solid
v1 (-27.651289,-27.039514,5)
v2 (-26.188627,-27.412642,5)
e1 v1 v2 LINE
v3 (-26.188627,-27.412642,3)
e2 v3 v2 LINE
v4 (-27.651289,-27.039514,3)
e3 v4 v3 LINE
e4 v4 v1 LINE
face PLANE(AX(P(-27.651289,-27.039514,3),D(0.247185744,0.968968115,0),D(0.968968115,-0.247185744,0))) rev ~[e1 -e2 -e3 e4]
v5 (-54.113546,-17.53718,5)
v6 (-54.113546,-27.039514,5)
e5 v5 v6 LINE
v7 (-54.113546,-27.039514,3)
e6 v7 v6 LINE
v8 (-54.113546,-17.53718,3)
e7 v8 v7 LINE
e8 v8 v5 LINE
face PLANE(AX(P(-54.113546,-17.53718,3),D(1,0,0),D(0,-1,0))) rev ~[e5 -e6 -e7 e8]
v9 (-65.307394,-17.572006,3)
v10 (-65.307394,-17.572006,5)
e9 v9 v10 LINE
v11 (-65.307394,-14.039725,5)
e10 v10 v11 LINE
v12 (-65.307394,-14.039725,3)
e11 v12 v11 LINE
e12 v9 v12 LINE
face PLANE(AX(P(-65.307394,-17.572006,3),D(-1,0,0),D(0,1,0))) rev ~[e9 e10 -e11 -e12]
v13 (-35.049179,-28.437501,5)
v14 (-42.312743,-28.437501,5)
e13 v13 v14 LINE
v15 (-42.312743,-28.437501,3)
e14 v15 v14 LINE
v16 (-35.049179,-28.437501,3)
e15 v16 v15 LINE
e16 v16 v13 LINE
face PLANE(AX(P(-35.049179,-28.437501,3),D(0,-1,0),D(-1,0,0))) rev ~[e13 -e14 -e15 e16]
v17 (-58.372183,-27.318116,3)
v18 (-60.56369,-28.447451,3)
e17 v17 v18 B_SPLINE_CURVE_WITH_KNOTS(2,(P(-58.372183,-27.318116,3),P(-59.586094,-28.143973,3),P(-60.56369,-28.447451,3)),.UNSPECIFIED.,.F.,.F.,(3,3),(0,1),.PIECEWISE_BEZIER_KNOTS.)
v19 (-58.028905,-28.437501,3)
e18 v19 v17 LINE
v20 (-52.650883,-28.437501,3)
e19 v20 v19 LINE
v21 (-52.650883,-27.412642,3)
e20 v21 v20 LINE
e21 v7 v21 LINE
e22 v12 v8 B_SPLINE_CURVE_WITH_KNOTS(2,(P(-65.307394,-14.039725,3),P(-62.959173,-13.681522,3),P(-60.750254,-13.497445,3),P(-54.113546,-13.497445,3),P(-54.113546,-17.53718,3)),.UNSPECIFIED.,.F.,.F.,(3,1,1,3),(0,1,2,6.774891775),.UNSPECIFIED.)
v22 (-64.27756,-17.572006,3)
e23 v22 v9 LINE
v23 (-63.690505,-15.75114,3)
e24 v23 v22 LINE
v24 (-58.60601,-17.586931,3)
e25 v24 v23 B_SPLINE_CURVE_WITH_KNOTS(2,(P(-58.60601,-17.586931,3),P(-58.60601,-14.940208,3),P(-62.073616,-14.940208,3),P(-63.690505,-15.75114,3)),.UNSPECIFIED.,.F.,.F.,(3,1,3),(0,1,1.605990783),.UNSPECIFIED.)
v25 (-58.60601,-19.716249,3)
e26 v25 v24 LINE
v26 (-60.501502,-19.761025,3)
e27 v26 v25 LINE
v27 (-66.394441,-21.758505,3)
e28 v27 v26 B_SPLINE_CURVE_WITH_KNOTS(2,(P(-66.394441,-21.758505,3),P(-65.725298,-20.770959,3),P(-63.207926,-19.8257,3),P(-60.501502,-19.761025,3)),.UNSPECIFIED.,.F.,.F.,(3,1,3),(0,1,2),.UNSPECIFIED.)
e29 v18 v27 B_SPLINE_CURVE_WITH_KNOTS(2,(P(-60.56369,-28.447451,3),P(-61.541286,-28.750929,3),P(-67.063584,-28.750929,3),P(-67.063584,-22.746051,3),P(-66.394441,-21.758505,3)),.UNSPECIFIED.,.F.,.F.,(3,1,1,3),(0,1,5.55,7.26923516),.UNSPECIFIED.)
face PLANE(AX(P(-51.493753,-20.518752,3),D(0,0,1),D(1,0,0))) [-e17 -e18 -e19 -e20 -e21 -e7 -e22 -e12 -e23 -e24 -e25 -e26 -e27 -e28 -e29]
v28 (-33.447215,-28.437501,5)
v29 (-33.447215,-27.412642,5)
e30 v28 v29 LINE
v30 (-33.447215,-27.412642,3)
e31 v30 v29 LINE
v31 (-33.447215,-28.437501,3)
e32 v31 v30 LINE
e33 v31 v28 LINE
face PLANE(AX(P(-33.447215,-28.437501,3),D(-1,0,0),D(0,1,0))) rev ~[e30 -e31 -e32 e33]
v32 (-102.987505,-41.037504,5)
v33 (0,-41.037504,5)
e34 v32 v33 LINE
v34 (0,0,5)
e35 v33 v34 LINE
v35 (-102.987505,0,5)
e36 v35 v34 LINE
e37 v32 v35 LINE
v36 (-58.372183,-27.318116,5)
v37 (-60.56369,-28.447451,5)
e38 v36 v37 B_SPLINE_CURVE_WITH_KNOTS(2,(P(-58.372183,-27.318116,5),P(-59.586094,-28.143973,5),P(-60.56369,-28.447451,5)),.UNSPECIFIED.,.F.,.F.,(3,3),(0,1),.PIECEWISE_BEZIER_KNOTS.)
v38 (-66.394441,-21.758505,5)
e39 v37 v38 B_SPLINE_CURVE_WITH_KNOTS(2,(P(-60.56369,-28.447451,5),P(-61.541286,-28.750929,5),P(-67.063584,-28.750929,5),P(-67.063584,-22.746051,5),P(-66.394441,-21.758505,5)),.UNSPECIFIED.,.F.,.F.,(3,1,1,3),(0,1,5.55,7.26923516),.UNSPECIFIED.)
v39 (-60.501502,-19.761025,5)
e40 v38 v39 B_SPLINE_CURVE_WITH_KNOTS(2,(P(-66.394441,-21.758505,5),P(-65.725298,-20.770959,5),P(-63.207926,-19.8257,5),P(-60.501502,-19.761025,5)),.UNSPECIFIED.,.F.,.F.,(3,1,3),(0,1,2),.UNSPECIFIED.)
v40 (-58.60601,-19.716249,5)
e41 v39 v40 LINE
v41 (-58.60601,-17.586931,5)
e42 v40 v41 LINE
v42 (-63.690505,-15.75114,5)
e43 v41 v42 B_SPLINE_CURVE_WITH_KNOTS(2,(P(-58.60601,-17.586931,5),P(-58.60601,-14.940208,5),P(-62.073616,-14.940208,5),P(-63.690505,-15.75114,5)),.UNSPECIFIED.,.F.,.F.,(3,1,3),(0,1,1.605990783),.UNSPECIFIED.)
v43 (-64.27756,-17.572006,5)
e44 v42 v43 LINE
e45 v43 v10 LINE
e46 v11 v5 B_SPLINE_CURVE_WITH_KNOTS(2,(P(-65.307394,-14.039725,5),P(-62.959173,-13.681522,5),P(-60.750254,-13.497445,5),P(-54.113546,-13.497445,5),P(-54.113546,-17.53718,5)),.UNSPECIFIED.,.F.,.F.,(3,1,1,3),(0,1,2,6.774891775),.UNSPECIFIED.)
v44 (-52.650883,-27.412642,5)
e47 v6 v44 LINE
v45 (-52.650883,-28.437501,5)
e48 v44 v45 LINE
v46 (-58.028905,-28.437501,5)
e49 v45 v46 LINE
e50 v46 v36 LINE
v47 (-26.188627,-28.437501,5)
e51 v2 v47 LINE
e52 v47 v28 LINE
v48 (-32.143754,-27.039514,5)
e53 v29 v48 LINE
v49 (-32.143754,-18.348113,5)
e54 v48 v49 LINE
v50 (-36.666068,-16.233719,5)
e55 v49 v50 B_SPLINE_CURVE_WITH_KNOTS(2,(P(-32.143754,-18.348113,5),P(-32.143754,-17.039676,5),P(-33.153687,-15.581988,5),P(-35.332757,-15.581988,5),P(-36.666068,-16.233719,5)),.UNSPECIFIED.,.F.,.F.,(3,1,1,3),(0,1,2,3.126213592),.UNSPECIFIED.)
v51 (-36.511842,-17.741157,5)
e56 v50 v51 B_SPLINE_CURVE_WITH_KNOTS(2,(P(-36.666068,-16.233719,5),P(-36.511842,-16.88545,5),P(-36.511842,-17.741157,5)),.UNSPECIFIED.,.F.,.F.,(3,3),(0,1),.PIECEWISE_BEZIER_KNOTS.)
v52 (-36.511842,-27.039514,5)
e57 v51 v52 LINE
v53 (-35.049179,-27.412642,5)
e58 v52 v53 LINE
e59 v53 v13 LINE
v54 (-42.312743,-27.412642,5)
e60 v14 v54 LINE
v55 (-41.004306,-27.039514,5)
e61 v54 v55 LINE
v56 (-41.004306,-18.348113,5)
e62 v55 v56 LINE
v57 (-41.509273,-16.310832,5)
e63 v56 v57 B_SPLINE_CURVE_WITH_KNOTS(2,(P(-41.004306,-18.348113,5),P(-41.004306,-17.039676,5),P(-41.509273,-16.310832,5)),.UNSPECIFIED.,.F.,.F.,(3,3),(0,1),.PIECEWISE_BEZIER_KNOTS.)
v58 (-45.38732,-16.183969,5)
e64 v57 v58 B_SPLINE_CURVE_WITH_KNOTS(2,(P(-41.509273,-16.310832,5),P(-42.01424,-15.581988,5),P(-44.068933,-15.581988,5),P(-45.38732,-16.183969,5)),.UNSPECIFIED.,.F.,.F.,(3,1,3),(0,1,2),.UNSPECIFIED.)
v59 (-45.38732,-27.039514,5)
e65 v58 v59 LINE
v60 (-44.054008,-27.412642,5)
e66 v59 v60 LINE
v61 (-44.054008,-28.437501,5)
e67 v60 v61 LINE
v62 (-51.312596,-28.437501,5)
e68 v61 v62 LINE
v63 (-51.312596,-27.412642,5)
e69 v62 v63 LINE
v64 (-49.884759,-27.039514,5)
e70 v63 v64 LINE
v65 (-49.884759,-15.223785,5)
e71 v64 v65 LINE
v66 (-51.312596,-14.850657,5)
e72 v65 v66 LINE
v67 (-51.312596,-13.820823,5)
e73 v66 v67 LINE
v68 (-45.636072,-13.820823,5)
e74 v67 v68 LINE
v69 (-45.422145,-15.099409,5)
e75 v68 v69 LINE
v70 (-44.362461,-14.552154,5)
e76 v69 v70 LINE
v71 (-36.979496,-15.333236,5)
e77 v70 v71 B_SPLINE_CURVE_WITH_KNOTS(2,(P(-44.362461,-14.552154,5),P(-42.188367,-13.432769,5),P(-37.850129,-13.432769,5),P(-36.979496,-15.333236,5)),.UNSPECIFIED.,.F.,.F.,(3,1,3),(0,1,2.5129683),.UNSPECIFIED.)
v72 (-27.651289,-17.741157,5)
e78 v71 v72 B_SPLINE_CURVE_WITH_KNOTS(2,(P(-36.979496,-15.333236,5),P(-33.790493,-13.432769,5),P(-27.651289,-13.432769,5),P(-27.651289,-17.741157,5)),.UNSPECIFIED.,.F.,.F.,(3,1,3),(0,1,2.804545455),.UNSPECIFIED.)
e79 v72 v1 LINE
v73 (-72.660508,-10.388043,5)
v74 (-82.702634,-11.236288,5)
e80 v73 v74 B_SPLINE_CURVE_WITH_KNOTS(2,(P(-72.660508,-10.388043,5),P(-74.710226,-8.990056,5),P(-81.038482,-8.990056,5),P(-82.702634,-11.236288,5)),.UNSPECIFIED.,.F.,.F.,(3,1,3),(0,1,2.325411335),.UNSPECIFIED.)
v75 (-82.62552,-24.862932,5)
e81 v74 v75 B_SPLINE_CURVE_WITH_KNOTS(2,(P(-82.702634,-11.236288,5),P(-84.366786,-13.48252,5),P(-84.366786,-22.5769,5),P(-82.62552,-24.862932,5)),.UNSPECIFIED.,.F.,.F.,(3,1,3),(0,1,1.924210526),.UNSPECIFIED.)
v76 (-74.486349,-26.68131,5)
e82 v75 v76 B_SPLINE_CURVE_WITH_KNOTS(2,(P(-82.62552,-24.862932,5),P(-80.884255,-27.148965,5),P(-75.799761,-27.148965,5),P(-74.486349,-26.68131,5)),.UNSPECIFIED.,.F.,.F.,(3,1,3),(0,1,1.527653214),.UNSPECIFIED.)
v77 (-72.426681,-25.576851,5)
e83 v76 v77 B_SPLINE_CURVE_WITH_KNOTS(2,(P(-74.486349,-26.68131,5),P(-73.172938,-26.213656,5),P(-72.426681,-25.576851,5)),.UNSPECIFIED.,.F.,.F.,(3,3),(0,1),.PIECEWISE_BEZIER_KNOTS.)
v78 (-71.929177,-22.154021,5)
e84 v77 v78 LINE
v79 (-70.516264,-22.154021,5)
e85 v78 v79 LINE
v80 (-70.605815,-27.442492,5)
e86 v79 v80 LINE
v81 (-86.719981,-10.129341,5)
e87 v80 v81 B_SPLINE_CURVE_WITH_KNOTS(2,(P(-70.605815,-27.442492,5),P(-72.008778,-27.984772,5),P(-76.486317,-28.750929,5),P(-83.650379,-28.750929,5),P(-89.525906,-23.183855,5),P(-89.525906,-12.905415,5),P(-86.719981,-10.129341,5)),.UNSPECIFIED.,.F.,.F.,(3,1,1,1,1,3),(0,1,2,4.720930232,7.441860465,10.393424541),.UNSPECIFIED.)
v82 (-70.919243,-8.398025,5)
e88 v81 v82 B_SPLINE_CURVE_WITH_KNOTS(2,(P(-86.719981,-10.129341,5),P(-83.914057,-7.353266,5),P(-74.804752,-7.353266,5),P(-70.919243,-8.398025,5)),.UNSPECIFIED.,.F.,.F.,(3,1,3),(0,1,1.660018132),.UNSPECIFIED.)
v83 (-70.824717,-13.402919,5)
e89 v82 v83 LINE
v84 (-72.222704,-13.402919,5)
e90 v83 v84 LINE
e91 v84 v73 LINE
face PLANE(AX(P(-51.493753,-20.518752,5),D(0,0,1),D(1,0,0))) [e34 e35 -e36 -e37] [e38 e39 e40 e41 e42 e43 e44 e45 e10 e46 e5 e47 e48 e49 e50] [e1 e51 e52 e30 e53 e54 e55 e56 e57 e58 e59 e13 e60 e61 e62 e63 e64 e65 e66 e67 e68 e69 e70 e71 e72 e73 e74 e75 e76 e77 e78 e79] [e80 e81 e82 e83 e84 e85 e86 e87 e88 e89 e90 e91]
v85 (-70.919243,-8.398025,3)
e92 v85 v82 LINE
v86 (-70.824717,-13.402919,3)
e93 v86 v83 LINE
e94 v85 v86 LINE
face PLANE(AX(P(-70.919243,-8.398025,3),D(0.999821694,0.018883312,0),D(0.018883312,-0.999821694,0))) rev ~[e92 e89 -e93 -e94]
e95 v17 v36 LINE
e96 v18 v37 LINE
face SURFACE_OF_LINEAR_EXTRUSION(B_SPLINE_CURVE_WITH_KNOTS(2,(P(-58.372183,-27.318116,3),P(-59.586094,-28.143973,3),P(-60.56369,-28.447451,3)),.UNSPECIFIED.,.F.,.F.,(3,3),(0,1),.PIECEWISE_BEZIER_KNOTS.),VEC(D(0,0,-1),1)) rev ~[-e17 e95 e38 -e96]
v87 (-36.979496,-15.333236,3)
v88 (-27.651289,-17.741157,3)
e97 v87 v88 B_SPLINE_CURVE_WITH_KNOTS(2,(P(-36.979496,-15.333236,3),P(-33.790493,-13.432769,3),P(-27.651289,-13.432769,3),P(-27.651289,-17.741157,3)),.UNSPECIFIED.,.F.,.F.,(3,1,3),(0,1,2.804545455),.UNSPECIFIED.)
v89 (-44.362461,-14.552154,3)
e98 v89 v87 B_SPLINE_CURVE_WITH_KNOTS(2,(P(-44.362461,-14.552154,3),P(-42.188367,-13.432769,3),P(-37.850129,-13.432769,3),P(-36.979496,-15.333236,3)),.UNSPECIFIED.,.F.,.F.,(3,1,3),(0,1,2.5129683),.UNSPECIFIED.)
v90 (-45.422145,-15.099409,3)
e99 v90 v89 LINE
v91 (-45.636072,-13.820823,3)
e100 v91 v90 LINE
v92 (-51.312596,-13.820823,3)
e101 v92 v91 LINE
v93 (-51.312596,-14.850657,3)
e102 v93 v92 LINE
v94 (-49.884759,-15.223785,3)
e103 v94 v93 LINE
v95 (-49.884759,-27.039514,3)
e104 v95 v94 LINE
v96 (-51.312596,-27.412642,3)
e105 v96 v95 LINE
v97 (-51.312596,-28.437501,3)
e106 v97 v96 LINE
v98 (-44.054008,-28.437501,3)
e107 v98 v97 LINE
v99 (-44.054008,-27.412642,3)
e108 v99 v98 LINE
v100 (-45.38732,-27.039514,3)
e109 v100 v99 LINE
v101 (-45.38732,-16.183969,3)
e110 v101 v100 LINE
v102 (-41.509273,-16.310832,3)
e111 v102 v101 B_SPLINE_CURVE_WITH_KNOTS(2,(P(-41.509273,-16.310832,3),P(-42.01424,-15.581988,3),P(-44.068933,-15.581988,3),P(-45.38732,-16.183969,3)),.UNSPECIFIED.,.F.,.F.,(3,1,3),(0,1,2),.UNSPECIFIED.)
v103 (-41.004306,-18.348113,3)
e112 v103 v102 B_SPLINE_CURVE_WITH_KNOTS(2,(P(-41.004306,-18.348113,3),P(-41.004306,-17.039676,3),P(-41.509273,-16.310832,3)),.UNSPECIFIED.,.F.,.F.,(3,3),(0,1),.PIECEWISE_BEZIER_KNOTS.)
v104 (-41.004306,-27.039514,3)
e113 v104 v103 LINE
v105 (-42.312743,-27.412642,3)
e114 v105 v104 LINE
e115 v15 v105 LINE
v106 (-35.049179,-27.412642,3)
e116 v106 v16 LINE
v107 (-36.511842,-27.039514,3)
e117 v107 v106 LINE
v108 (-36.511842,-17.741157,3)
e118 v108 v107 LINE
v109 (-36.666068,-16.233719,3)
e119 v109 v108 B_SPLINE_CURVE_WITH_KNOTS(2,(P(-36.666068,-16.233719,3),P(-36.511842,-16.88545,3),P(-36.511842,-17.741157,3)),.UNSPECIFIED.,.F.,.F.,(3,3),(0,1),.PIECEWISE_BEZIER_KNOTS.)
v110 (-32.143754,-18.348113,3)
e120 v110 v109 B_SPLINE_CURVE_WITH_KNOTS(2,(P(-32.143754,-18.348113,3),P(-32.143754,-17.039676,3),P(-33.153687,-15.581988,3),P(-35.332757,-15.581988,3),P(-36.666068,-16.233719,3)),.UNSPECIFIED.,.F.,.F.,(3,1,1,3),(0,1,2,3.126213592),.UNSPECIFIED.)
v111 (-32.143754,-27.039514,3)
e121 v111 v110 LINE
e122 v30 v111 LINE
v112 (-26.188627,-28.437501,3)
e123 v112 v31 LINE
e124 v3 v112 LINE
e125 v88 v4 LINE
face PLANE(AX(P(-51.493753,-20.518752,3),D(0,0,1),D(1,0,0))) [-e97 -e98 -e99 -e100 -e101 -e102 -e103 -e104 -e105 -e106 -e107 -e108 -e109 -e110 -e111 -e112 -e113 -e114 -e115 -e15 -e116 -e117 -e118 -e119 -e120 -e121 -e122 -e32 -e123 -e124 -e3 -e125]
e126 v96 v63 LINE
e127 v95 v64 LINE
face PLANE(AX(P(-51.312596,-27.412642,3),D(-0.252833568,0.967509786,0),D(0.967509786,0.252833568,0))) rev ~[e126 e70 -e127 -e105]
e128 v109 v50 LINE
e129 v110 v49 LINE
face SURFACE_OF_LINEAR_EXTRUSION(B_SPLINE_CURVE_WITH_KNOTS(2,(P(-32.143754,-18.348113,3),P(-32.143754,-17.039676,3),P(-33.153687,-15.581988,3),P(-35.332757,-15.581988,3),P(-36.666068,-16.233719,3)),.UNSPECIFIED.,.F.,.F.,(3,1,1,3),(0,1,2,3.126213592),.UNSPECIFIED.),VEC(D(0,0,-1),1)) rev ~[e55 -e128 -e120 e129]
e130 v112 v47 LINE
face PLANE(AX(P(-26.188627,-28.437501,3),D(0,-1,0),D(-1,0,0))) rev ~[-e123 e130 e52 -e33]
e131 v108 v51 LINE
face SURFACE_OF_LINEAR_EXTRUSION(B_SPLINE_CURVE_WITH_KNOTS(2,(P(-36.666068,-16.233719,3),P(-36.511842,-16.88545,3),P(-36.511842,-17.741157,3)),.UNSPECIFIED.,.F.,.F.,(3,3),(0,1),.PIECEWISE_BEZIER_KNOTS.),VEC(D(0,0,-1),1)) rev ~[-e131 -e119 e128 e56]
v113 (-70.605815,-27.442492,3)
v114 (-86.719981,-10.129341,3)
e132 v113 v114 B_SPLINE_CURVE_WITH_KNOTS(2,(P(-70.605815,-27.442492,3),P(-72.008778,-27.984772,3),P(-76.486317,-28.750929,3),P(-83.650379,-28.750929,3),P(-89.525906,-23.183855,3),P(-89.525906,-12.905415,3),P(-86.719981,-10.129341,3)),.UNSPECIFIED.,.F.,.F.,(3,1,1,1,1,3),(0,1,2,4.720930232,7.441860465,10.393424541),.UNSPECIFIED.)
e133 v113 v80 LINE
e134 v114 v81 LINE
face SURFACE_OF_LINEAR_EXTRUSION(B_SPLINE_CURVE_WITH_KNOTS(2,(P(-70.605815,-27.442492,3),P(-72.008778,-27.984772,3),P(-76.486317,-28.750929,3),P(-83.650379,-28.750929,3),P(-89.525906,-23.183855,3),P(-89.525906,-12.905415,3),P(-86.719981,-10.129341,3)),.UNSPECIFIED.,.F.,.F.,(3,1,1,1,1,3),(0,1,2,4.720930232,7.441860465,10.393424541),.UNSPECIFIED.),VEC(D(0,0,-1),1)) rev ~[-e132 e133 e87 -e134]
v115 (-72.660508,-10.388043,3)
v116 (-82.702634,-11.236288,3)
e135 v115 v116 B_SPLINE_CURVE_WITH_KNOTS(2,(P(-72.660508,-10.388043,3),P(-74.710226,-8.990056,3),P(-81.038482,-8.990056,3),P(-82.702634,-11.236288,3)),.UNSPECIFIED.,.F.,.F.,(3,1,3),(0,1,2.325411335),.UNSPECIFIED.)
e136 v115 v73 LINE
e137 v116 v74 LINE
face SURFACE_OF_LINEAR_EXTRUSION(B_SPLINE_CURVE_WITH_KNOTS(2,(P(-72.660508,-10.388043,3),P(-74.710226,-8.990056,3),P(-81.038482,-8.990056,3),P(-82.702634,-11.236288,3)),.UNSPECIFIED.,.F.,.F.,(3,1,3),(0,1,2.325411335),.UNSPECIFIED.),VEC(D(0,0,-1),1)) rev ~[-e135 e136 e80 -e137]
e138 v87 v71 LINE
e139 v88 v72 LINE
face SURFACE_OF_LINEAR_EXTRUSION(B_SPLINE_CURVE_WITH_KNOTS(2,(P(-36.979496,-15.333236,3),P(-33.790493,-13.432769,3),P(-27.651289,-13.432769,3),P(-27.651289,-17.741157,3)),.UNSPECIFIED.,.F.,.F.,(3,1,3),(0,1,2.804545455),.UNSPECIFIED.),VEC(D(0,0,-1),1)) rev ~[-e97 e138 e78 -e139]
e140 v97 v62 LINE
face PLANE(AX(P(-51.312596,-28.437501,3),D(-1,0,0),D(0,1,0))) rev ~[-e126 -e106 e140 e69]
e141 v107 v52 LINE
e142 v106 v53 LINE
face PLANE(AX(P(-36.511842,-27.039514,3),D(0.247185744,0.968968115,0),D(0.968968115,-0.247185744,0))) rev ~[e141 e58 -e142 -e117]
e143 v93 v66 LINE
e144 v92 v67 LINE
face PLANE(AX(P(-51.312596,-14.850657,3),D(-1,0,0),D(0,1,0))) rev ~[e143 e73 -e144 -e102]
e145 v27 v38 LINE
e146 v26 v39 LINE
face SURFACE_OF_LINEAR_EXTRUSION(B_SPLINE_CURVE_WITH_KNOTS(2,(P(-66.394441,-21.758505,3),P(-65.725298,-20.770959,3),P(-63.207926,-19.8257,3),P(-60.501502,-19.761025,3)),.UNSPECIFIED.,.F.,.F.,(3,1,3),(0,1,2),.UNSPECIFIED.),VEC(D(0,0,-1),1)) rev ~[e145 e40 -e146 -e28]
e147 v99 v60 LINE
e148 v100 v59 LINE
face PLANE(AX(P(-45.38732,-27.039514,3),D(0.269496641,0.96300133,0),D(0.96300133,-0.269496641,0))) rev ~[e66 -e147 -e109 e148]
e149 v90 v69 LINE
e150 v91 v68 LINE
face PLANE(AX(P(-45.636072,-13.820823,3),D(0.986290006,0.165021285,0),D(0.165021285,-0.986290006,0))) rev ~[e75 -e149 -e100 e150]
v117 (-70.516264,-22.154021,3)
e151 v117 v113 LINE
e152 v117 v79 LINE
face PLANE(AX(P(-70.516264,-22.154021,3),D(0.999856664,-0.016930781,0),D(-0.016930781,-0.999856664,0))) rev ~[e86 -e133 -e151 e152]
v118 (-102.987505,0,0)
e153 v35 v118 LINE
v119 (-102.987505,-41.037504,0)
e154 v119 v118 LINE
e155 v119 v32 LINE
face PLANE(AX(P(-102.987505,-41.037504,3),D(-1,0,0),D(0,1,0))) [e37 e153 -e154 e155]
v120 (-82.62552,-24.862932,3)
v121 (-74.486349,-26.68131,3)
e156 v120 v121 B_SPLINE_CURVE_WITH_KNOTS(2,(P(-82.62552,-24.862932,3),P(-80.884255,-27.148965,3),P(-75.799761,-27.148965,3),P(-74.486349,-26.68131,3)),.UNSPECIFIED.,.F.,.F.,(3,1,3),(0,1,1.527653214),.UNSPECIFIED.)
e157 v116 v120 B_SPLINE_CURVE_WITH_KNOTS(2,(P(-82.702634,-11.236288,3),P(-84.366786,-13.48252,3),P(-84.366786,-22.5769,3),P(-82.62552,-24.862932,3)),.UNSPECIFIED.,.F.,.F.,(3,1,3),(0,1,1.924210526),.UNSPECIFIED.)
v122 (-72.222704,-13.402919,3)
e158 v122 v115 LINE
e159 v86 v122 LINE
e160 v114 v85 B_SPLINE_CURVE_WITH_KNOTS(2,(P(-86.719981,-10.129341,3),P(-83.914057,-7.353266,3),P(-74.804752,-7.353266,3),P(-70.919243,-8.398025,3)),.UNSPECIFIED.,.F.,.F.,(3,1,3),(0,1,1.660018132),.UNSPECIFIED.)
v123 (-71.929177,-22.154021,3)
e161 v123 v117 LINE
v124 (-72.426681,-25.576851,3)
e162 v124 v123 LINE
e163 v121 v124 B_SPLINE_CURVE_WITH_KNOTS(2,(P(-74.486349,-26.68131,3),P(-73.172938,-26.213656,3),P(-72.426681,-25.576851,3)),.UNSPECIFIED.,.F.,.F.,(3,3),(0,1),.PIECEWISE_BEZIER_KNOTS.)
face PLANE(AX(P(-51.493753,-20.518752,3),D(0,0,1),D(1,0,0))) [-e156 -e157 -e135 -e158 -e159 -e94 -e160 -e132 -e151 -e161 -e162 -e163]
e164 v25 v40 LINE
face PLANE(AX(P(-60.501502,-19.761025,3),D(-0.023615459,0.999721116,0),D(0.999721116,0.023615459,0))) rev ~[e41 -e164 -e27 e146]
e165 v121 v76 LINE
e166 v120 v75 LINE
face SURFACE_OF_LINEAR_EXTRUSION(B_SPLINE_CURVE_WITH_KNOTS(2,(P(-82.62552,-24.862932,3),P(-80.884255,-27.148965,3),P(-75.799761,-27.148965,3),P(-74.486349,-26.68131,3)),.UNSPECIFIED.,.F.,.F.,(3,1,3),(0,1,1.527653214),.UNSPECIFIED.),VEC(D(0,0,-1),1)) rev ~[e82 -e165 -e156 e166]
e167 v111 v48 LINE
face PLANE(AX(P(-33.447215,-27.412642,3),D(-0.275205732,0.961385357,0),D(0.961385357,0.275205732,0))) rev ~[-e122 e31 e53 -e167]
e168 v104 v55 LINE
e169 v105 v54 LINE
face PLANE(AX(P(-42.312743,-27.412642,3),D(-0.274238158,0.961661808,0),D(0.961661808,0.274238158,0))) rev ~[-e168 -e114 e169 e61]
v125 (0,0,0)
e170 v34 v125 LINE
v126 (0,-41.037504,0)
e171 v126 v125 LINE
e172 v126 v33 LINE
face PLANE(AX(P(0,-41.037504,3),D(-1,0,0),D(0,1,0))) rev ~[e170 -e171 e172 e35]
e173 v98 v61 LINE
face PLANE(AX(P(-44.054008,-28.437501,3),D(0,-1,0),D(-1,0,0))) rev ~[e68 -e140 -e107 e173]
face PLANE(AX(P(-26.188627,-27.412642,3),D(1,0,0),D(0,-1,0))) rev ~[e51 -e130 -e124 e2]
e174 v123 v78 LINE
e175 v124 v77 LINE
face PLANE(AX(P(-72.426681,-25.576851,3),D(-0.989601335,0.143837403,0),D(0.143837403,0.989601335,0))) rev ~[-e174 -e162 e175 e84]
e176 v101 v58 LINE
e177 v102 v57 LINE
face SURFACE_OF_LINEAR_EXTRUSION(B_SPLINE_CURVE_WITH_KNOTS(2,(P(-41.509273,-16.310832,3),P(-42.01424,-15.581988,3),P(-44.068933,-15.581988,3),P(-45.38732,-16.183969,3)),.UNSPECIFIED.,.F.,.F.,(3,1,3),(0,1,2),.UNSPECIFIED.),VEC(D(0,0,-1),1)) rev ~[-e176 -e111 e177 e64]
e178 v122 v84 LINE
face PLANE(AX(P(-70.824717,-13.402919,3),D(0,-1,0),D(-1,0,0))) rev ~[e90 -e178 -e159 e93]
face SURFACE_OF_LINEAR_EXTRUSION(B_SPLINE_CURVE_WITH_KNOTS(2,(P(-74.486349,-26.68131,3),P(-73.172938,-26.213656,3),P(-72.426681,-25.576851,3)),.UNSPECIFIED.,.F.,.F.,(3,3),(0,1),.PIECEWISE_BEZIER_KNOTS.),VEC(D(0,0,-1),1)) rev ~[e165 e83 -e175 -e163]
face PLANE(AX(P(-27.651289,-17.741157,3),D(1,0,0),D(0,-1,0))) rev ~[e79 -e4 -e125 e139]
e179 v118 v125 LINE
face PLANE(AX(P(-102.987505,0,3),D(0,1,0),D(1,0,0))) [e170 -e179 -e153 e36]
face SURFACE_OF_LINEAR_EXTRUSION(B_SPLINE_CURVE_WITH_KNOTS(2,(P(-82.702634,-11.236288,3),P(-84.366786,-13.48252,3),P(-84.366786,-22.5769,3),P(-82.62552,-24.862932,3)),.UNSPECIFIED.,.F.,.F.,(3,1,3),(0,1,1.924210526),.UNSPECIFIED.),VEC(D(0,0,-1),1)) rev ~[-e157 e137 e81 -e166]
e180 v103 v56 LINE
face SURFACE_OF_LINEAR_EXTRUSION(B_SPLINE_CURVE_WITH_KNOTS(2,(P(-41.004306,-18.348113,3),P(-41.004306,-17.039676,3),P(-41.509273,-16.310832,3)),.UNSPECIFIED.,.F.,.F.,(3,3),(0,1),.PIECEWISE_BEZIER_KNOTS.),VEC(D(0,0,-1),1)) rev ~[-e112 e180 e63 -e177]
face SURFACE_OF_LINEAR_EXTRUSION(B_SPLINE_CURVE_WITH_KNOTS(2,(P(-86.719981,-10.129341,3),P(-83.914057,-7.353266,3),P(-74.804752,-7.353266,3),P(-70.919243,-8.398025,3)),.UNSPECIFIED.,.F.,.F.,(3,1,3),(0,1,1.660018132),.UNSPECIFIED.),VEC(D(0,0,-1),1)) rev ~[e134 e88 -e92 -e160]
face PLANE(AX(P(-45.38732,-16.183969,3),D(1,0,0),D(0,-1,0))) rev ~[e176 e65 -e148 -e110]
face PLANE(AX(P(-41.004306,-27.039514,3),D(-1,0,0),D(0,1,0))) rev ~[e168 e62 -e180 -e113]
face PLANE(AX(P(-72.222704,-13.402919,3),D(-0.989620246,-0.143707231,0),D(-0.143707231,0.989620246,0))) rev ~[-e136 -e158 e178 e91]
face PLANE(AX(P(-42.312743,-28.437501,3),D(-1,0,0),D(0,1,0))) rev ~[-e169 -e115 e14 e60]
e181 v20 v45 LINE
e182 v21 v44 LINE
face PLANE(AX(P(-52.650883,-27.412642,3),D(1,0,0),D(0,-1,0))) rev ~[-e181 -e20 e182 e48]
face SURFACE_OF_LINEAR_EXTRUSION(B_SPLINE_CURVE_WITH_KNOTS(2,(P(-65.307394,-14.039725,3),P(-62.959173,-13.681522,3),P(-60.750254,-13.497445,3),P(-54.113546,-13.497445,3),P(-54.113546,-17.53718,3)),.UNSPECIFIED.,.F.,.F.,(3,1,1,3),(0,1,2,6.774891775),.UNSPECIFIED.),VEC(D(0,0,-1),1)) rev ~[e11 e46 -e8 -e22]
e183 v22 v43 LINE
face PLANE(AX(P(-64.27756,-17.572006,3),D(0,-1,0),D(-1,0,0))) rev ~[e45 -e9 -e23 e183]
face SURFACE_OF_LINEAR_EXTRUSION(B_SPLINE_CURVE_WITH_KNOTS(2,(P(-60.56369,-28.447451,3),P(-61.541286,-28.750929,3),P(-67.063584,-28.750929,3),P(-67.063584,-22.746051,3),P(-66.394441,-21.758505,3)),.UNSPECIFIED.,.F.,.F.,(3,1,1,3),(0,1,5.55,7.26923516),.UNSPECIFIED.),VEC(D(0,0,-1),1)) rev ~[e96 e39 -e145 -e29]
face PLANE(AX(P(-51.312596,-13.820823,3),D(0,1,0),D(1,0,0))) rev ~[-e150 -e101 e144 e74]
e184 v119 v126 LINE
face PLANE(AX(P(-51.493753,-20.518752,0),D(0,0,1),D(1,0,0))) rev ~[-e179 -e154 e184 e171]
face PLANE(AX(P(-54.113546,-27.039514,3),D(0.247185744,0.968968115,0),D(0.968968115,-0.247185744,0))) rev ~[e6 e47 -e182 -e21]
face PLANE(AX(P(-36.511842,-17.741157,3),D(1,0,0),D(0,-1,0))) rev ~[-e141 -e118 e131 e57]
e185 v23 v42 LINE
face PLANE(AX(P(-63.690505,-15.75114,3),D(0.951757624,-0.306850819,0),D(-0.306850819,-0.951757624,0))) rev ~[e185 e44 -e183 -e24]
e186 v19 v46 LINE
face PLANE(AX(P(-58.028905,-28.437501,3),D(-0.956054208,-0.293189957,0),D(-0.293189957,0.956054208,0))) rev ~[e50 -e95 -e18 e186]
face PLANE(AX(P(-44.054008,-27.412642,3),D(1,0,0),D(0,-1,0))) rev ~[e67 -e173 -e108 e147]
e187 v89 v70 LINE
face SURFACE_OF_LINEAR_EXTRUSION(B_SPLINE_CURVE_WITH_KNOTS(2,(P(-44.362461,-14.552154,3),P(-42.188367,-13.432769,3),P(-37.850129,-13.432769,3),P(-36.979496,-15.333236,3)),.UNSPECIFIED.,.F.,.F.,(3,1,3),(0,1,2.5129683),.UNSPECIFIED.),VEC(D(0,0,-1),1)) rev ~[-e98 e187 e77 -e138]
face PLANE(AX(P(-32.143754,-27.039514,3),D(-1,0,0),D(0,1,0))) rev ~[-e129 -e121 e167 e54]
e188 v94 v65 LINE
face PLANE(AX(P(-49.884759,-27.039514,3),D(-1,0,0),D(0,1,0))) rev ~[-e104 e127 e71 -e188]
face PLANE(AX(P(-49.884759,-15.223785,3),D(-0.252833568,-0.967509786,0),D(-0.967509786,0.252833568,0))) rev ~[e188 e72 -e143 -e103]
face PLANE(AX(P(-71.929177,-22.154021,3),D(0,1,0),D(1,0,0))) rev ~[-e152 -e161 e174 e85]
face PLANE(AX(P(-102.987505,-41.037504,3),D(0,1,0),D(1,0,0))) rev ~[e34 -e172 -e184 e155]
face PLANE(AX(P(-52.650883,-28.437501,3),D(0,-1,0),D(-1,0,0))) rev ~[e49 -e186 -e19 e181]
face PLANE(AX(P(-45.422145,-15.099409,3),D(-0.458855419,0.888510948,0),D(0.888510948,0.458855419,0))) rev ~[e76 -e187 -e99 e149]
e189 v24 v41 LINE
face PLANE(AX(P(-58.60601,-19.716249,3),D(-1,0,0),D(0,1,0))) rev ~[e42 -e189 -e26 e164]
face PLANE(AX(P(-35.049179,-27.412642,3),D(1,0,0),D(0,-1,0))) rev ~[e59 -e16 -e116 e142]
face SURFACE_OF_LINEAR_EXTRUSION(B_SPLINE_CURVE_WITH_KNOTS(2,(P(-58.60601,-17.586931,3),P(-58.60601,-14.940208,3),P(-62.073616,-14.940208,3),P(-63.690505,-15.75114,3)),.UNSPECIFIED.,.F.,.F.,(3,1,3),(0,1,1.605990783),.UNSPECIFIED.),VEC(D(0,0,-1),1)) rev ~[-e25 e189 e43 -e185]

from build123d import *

# Parameters (mm, degrees)
F0_W     = 102.9875054955
F0_H     = 41.0375036299
F1_DEPTH = 3
F2_W     = 102.9875054955
F2_H     = 41.0375036299
F3_DEPTH = 2


with BuildPart() as f1:
    # F0 (on Top) → F1 (new body)
    with BuildSketch(Plane.XY):
        with Locations((-51.4937527478, -20.518751815)):
            Rectangle(F0_W, F0_H)
    extrude(amount=F1_DEPTH)

    # F2 (on face) → F3 (join)
    with BuildSketch(Plane.XY.offset(3)):
        with Locations((-51.4937527478, -20.518751815)):
            Rectangle(F2_W, F2_H)
        with BuildLine():
            add(Edge.make_bspline(
                [(-61.8547136732, -13.5894833709), (-60.7502540071, -13.4974450654), (-59.601018949, -13.4974450654)],
                knots=[0, 0, 0, 1, 1, 1], degree=2))
            add(Edge.make_bspline(
                [(-59.601018949, -13.4974450654), (-54.1135459231, -13.4974450654), (-54.1135459231, -17.5371804208)],
                knots=[0, 0, 0, 1, 1, 1], degree=2))
            Line((-54.1135459231, -17.5371804208), (-54.1135459231, -27.0395135845))
            Line((-54.1135459231, -27.0395135845), (-52.650883122, -27.4126418501))
            Line((-52.650883122, -27.4126418501), (-52.650883122, -28.4375008196))
            Line((-52.650883122, -28.4375008196), (-58.02890519, -28.4375008196))
            Line((-58.02890519, -28.4375008196), (-58.3721831944, -27.3181160228))
            add(Edge.make_bspline(
                [(-58.3721831944, -27.3181160228), (-59.5860938184, -28.1439732506), (-60.5636898743, -28.4474509066)],
                knots=[0, 0, 0, 1, 1, 1], degree=2))
            add(Edge.make_bspline(
                [(-60.5636898743, -28.4474509066), (-61.5412859301, -28.7509285627), (-62.5362946383, -28.7509285627)],
                knots=[0, 0, 0, 1, 1, 1], degree=2))
            add(Edge.make_bspline(
                [(-62.5362946383, -28.7509285627), (-67.0635842608, -28.7509285627), (-67.0635842608, -24.3927904206)],
                knots=[0, 0, 0, 1, 1, 1], degree=2))
            add(Edge.make_bspline(
                [(-67.0635842608, -24.3927904206), (-67.0635842608, -22.7460510085), (-66.3944409045, -21.7585048655)],
                knots=[0, 0, 0, 1, 1, 1], degree=2))
            add(Edge.make_bspline(
                [(-66.3944409045, -21.7585048655), (-65.7252975482, -20.7709587226), (-64.4666115323, -20.2983295862)],
                knots=[0, 0, 0, 1, 1, 1], degree=2))
            add(Edge.make_bspline(
                [(-64.4666115323, -20.2983295862), (-63.2079255164, -19.8257004498), (-60.50150183, -19.7610248837)],
                knots=[0, 0, 0, 1, 1, 1], degree=2))
            Line((-60.50150183, -19.7610248837), (-58.6060102408, -19.7162494919))
            Line((-58.6060102408, -19.7162494919), (-58.6060102408, -17.5869308562))
            add(Edge.make_bspline(
                [(-58.6060102408, -17.5869308562), (-58.6060102408, -14.9402076923), (-60.7651791377, -14.9402076923)],
                knots=[0, 0, 0, 1, 1, 1], degree=2))
            add(Edge.make_bspline(
                [(-60.7651791377, -14.9402076923), (-62.073615589, -14.9402076923), (-63.6905047399, -15.7511397895)],
                knots=[0, 0, 0, 1, 1, 1], degree=2))
            Line((-63.6905047399, -15.7511397895), (-64.2775598778, -17.5720057256))
            Line((-64.2775598778, -17.5720057256), (-65.3073938908, -17.5720057256))
            Line((-65.3073938908, -17.5720057256), (-65.3073938908, -14.0397248114))
            add(Edge.make_bspline(
                [(-65.3073938908, -14.0397248114), (-62.9591733393, -13.6815216764), (-61.8547136732, -13.5894833709)],
                knots=[0, 0, 0, 1, 1, 1], degree=2))
        make_face(mode=Mode.SUBTRACT)
        with BuildLine():
            Line((-45.6360717289, -13.8208228956), (-45.4221448567, -15.0994090857))
            Line((-45.4221448567, -15.0994090857), (-44.3624605824, -14.5521542961))
            add(Edge.make_bspline(
                [(-44.3624605824, -14.5521542961), (-42.1883665549, -13.4327694994), (-40.4620264461, -13.4327694994)],
                knots=[0, 0, 0, 1, 1, 1], degree=2))
            add(Edge.make_bspline(
                [(-40.4620264461, -13.4327694994), (-37.850128587, -13.4327694994), (-36.9794959673, -15.3332361321)],
                knots=[0, 0, 0, 1, 1, 1], degree=2))
            add(Edge.make_bspline(
                [(-36.9794959673, -15.3332361321), (-33.7904930574, -13.4327694994), (-31.6014738993, -13.4327694994)],
                knots=[0, 0, 0, 1, 1, 1], degree=2))
            add(Edge.make_bspline(
                [(-31.6014738993, -13.4327694994), (-27.6512893276, -13.4327694994), (-27.6512893276, -17.741157206)],
                knots=[0, 0, 0, 1, 1, 1], degree=2))
            Line((-27.6512893276, -17.741157206), (-27.6512893276, -27.0395135845))
            Line((-27.6512893276, -27.0395135845), (-26.1886265265, -27.4126418501))
            Line((-26.1886265265, -27.4126418501), (-26.1886265265, -28.4375008196))
            Line((-26.1886265265, -28.4375008196), (-33.4472150531, -28.4375008196))
            Line((-33.4472150531, -28.4375008196), (-33.4472150531, -27.4126418501))
            Line((-33.4472150531, -27.4126418501), (-32.1437536453, -27.0395135845))
            Line((-32.1437536453, -27.0395135845), (-32.1437536453, -18.348112518))
            add(Edge.make_bspline(
                [(-32.1437536453, -18.348112518), (-32.1437536453, -17.0396760667), (-32.6487205647, -16.3108321879)],
                knots=[0, 0, 0, 1, 1, 1], degree=2))
            add(Edge.make_bspline(
                [(-32.6487205647, -16.3108321879), (-33.1536874841, -15.5819883091), (-34.1785464536, -15.5819883091)],
                knots=[0, 0, 0, 1, 1, 1], degree=2))
            add(Edge.make_bspline(
                [(-34.1785464536, -15.5819883091), (-35.3327565552, -15.5819883091), (-36.6660682242, -16.233719013)],
                knots=[0, 0, 0, 1, 1, 1], degree=2))
            add(Edge.make_bspline(
                [(-36.6660682242, -16.233719013), (-36.5118418744, -16.8854497169), (-36.5118418744, -17.741157206)],
                knots=[0, 0, 0, 1, 1, 1], degree=2))
            Line((-36.5118418744, -17.741157206), (-36.5118418744, -27.0395135845))
            Line((-36.5118418744, -27.0395135845), (-35.0491790733, -27.4126418501))
            Line((-35.0491790733, -27.4126418501), (-35.0491790733, -28.4375008196))
            Line((-35.0491790733, -28.4375008196), (-42.3127426434, -28.4375008196))
            Line((-42.3127426434, -28.4375008196), (-42.3127426434, -27.4126418501))
            Line((-42.3127426434, -27.4126418501), (-41.0043061921, -27.0395135845))
            Line((-41.0043061921, -27.0395135845), (-41.0043061921, -18.348112518))
            add(Edge.make_bspline(
                [(-41.0043061921, -18.348112518), (-41.0043061921, -17.0396760667), (-41.5092731115, -16.3108321879)],
                knots=[0, 0, 0, 1, 1, 1], degree=2))
            add(Edge.make_bspline(
                [(-41.5092731115, -16.3108321879), (-42.014240031, -15.5819883091), (-43.0415865222, -15.5819883091)],
                knots=[0, 0, 0, 1, 1, 1], degree=2))
            add(Edge.make_bspline(
                [(-43.0415865222, -15.5819883091), (-44.0689330135, -15.5819883091), (-45.3873195519, -16.1839685776)],
                knots=[0, 0, 0, 1, 1, 1], degree=2))
            Line((-45.3873195519, -16.1839685776), (-45.3873195519, -27.0395135845))
            Line((-45.3873195519, -27.0395135845), (-44.0540078829, -27.4126418501))
            Line((-44.0540078829, -27.4126418501), (-44.0540078829, -28.4375008196))
            Line((-44.0540078829, -28.4375008196), (-51.3125964094, -28.4375008196))
            Line((-51.3125964094, -28.4375008196), (-51.3125964094, -27.4126418501))
            Line((-51.3125964094, -27.4126418501), (-49.8847589131, -27.0395135845))
            Line((-49.8847589131, -27.0395135845), (-49.8847589131, -15.2237851742))
            Line((-49.8847589131, -15.2237851742), (-51.3125964094, -14.8506569086))
            Line((-51.3125964094, -14.8506569086), (-51.3125964094, -13.8208228956))
            Line((-51.3125964094, -13.8208228956), (-45.6360717289, -13.8208228956))
        make_face(mode=Mode.SUBTRACT)
        with BuildLine():
            add(Edge.make_bspline(
                [(-74.2475471343, -28.36785021), (-76.4863167278, -28.7509285627), (-78.4116585783, -28.7509285627)],
                knots=[0, 0, 0, 1, 1, 1], degree=2))
            add(Edge.make_bspline(
                [(-78.4116585783, -28.7509285627), (-83.6503794271, -28.7509285627), (-86.5881426382, -25.9673917014)],
                knots=[0, 0, 0, 1, 1, 1], degree=2))
            add(Edge.make_bspline(
                [(-86.5881426382, -25.9673917014), (-89.5259058493, -23.1838548401), (-89.5259058493, -18.2535866908)],
                knots=[0, 0, 0, 1, 1, 1], degree=2))
            add(Edge.make_bspline(
                [(-89.5259058493, -18.2535866908), (-89.5259058493, -12.905414884), (-86.719981292, -10.129340588)],
                knots=[0, 0, 0, 1, 1, 1], degree=2))
            add(Edge.make_bspline(
                [(-86.719981292, -10.129340588), (-83.9140567348, -7.353266292), (-78.4265837089, -7.353266292)],
                knots=[0, 0, 0, 1, 1, 1], degree=2))
            add(Edge.make_bspline(
                [(-78.4265837089, -7.353266292), (-74.8047520109, -7.353266292), (-70.9192430052, -8.3980254357)],
                knots=[0, 0, 0, 1, 1, 1], degree=2))
            Line((-70.9192430052, -8.3980254357), (-70.824717178, -13.4029192381))
            Line((-70.824717178, -13.4029192381), (-72.222704413, -13.4029192381))
            Line((-72.222704413, -13.4029192381), (-72.6605082447, -10.3880428522))
            add(Edge.make_bspline(
                [(-72.6605082447, -10.3880428522), (-74.7102261836, -8.9900556171), (-77.4315750006, -8.9900556171)],
                knots=[0, 0, 0, 1, 1, 1], degree=2))
            add(Edge.make_bspline(
                [(-77.4315750006, -8.9900556171), (-81.038481568, -8.9900556171), (-82.7026336325, -11.2362877759)],
                knots=[0, 0, 0, 1, 1, 1], degree=2))
            add(Edge.make_bspline(
                [(-82.7026336325, -11.2362877759), (-84.3667856971, -13.4825199348), (-84.3667856971, -18.2088112989)],
                knots=[0, 0, 0, 1, 1, 1], degree=2))
            add(Edge.make_bspline(
                [(-84.3667856971, -18.2088112989), (-84.3667856971, -22.5768995281), (-82.6255204576, -24.8629320352)],
                knots=[0, 0, 0, 1, 1, 1], degree=2))
            add(Edge.make_bspline(
                [(-82.6255204576, -24.8629320352), (-80.8842552182, -27.1489645424), (-77.5559510892, -27.1489645424)],
                knots=[0, 0, 0, 1, 1, 1], degree=2))
            add(Edge.make_bspline(
                [(-77.5559510892, -27.1489645424), (-75.7997607191, -27.1489645424), (-74.4863492243, -26.6813104495)],
                knots=[0, 0, 0, 1, 1, 1], degree=2))
            add(Edge.make_bspline(
                [(-74.4863492243, -26.6813104495), (-73.1729377294, -26.2136563567), (-72.4266811982, -25.5768507834)],
                knots=[0, 0, 0, 1, 1, 1], degree=2))
            Line((-72.4266811982, -25.5768507834), (-71.9291768441, -22.1540208271))
            Line((-71.9291768441, -22.1540208271), (-70.5162644784, -22.1540208271))
            Line((-70.5162644784, -22.1540208271), (-70.6058152621, -27.4424921113))
            add(Edge.make_bspline(
                [(-70.6058152621, -27.4424921113), (-72.0087775408, -27.9847718573), (-74.2475471343, -28.36785021)],
                knots=[0, 0, 0, 1, 1, 1], degree=2))
        make_face(mode=Mode.SUBTRACT)
    extrude(amount=F3_DEPTH)


solid = f1.part
